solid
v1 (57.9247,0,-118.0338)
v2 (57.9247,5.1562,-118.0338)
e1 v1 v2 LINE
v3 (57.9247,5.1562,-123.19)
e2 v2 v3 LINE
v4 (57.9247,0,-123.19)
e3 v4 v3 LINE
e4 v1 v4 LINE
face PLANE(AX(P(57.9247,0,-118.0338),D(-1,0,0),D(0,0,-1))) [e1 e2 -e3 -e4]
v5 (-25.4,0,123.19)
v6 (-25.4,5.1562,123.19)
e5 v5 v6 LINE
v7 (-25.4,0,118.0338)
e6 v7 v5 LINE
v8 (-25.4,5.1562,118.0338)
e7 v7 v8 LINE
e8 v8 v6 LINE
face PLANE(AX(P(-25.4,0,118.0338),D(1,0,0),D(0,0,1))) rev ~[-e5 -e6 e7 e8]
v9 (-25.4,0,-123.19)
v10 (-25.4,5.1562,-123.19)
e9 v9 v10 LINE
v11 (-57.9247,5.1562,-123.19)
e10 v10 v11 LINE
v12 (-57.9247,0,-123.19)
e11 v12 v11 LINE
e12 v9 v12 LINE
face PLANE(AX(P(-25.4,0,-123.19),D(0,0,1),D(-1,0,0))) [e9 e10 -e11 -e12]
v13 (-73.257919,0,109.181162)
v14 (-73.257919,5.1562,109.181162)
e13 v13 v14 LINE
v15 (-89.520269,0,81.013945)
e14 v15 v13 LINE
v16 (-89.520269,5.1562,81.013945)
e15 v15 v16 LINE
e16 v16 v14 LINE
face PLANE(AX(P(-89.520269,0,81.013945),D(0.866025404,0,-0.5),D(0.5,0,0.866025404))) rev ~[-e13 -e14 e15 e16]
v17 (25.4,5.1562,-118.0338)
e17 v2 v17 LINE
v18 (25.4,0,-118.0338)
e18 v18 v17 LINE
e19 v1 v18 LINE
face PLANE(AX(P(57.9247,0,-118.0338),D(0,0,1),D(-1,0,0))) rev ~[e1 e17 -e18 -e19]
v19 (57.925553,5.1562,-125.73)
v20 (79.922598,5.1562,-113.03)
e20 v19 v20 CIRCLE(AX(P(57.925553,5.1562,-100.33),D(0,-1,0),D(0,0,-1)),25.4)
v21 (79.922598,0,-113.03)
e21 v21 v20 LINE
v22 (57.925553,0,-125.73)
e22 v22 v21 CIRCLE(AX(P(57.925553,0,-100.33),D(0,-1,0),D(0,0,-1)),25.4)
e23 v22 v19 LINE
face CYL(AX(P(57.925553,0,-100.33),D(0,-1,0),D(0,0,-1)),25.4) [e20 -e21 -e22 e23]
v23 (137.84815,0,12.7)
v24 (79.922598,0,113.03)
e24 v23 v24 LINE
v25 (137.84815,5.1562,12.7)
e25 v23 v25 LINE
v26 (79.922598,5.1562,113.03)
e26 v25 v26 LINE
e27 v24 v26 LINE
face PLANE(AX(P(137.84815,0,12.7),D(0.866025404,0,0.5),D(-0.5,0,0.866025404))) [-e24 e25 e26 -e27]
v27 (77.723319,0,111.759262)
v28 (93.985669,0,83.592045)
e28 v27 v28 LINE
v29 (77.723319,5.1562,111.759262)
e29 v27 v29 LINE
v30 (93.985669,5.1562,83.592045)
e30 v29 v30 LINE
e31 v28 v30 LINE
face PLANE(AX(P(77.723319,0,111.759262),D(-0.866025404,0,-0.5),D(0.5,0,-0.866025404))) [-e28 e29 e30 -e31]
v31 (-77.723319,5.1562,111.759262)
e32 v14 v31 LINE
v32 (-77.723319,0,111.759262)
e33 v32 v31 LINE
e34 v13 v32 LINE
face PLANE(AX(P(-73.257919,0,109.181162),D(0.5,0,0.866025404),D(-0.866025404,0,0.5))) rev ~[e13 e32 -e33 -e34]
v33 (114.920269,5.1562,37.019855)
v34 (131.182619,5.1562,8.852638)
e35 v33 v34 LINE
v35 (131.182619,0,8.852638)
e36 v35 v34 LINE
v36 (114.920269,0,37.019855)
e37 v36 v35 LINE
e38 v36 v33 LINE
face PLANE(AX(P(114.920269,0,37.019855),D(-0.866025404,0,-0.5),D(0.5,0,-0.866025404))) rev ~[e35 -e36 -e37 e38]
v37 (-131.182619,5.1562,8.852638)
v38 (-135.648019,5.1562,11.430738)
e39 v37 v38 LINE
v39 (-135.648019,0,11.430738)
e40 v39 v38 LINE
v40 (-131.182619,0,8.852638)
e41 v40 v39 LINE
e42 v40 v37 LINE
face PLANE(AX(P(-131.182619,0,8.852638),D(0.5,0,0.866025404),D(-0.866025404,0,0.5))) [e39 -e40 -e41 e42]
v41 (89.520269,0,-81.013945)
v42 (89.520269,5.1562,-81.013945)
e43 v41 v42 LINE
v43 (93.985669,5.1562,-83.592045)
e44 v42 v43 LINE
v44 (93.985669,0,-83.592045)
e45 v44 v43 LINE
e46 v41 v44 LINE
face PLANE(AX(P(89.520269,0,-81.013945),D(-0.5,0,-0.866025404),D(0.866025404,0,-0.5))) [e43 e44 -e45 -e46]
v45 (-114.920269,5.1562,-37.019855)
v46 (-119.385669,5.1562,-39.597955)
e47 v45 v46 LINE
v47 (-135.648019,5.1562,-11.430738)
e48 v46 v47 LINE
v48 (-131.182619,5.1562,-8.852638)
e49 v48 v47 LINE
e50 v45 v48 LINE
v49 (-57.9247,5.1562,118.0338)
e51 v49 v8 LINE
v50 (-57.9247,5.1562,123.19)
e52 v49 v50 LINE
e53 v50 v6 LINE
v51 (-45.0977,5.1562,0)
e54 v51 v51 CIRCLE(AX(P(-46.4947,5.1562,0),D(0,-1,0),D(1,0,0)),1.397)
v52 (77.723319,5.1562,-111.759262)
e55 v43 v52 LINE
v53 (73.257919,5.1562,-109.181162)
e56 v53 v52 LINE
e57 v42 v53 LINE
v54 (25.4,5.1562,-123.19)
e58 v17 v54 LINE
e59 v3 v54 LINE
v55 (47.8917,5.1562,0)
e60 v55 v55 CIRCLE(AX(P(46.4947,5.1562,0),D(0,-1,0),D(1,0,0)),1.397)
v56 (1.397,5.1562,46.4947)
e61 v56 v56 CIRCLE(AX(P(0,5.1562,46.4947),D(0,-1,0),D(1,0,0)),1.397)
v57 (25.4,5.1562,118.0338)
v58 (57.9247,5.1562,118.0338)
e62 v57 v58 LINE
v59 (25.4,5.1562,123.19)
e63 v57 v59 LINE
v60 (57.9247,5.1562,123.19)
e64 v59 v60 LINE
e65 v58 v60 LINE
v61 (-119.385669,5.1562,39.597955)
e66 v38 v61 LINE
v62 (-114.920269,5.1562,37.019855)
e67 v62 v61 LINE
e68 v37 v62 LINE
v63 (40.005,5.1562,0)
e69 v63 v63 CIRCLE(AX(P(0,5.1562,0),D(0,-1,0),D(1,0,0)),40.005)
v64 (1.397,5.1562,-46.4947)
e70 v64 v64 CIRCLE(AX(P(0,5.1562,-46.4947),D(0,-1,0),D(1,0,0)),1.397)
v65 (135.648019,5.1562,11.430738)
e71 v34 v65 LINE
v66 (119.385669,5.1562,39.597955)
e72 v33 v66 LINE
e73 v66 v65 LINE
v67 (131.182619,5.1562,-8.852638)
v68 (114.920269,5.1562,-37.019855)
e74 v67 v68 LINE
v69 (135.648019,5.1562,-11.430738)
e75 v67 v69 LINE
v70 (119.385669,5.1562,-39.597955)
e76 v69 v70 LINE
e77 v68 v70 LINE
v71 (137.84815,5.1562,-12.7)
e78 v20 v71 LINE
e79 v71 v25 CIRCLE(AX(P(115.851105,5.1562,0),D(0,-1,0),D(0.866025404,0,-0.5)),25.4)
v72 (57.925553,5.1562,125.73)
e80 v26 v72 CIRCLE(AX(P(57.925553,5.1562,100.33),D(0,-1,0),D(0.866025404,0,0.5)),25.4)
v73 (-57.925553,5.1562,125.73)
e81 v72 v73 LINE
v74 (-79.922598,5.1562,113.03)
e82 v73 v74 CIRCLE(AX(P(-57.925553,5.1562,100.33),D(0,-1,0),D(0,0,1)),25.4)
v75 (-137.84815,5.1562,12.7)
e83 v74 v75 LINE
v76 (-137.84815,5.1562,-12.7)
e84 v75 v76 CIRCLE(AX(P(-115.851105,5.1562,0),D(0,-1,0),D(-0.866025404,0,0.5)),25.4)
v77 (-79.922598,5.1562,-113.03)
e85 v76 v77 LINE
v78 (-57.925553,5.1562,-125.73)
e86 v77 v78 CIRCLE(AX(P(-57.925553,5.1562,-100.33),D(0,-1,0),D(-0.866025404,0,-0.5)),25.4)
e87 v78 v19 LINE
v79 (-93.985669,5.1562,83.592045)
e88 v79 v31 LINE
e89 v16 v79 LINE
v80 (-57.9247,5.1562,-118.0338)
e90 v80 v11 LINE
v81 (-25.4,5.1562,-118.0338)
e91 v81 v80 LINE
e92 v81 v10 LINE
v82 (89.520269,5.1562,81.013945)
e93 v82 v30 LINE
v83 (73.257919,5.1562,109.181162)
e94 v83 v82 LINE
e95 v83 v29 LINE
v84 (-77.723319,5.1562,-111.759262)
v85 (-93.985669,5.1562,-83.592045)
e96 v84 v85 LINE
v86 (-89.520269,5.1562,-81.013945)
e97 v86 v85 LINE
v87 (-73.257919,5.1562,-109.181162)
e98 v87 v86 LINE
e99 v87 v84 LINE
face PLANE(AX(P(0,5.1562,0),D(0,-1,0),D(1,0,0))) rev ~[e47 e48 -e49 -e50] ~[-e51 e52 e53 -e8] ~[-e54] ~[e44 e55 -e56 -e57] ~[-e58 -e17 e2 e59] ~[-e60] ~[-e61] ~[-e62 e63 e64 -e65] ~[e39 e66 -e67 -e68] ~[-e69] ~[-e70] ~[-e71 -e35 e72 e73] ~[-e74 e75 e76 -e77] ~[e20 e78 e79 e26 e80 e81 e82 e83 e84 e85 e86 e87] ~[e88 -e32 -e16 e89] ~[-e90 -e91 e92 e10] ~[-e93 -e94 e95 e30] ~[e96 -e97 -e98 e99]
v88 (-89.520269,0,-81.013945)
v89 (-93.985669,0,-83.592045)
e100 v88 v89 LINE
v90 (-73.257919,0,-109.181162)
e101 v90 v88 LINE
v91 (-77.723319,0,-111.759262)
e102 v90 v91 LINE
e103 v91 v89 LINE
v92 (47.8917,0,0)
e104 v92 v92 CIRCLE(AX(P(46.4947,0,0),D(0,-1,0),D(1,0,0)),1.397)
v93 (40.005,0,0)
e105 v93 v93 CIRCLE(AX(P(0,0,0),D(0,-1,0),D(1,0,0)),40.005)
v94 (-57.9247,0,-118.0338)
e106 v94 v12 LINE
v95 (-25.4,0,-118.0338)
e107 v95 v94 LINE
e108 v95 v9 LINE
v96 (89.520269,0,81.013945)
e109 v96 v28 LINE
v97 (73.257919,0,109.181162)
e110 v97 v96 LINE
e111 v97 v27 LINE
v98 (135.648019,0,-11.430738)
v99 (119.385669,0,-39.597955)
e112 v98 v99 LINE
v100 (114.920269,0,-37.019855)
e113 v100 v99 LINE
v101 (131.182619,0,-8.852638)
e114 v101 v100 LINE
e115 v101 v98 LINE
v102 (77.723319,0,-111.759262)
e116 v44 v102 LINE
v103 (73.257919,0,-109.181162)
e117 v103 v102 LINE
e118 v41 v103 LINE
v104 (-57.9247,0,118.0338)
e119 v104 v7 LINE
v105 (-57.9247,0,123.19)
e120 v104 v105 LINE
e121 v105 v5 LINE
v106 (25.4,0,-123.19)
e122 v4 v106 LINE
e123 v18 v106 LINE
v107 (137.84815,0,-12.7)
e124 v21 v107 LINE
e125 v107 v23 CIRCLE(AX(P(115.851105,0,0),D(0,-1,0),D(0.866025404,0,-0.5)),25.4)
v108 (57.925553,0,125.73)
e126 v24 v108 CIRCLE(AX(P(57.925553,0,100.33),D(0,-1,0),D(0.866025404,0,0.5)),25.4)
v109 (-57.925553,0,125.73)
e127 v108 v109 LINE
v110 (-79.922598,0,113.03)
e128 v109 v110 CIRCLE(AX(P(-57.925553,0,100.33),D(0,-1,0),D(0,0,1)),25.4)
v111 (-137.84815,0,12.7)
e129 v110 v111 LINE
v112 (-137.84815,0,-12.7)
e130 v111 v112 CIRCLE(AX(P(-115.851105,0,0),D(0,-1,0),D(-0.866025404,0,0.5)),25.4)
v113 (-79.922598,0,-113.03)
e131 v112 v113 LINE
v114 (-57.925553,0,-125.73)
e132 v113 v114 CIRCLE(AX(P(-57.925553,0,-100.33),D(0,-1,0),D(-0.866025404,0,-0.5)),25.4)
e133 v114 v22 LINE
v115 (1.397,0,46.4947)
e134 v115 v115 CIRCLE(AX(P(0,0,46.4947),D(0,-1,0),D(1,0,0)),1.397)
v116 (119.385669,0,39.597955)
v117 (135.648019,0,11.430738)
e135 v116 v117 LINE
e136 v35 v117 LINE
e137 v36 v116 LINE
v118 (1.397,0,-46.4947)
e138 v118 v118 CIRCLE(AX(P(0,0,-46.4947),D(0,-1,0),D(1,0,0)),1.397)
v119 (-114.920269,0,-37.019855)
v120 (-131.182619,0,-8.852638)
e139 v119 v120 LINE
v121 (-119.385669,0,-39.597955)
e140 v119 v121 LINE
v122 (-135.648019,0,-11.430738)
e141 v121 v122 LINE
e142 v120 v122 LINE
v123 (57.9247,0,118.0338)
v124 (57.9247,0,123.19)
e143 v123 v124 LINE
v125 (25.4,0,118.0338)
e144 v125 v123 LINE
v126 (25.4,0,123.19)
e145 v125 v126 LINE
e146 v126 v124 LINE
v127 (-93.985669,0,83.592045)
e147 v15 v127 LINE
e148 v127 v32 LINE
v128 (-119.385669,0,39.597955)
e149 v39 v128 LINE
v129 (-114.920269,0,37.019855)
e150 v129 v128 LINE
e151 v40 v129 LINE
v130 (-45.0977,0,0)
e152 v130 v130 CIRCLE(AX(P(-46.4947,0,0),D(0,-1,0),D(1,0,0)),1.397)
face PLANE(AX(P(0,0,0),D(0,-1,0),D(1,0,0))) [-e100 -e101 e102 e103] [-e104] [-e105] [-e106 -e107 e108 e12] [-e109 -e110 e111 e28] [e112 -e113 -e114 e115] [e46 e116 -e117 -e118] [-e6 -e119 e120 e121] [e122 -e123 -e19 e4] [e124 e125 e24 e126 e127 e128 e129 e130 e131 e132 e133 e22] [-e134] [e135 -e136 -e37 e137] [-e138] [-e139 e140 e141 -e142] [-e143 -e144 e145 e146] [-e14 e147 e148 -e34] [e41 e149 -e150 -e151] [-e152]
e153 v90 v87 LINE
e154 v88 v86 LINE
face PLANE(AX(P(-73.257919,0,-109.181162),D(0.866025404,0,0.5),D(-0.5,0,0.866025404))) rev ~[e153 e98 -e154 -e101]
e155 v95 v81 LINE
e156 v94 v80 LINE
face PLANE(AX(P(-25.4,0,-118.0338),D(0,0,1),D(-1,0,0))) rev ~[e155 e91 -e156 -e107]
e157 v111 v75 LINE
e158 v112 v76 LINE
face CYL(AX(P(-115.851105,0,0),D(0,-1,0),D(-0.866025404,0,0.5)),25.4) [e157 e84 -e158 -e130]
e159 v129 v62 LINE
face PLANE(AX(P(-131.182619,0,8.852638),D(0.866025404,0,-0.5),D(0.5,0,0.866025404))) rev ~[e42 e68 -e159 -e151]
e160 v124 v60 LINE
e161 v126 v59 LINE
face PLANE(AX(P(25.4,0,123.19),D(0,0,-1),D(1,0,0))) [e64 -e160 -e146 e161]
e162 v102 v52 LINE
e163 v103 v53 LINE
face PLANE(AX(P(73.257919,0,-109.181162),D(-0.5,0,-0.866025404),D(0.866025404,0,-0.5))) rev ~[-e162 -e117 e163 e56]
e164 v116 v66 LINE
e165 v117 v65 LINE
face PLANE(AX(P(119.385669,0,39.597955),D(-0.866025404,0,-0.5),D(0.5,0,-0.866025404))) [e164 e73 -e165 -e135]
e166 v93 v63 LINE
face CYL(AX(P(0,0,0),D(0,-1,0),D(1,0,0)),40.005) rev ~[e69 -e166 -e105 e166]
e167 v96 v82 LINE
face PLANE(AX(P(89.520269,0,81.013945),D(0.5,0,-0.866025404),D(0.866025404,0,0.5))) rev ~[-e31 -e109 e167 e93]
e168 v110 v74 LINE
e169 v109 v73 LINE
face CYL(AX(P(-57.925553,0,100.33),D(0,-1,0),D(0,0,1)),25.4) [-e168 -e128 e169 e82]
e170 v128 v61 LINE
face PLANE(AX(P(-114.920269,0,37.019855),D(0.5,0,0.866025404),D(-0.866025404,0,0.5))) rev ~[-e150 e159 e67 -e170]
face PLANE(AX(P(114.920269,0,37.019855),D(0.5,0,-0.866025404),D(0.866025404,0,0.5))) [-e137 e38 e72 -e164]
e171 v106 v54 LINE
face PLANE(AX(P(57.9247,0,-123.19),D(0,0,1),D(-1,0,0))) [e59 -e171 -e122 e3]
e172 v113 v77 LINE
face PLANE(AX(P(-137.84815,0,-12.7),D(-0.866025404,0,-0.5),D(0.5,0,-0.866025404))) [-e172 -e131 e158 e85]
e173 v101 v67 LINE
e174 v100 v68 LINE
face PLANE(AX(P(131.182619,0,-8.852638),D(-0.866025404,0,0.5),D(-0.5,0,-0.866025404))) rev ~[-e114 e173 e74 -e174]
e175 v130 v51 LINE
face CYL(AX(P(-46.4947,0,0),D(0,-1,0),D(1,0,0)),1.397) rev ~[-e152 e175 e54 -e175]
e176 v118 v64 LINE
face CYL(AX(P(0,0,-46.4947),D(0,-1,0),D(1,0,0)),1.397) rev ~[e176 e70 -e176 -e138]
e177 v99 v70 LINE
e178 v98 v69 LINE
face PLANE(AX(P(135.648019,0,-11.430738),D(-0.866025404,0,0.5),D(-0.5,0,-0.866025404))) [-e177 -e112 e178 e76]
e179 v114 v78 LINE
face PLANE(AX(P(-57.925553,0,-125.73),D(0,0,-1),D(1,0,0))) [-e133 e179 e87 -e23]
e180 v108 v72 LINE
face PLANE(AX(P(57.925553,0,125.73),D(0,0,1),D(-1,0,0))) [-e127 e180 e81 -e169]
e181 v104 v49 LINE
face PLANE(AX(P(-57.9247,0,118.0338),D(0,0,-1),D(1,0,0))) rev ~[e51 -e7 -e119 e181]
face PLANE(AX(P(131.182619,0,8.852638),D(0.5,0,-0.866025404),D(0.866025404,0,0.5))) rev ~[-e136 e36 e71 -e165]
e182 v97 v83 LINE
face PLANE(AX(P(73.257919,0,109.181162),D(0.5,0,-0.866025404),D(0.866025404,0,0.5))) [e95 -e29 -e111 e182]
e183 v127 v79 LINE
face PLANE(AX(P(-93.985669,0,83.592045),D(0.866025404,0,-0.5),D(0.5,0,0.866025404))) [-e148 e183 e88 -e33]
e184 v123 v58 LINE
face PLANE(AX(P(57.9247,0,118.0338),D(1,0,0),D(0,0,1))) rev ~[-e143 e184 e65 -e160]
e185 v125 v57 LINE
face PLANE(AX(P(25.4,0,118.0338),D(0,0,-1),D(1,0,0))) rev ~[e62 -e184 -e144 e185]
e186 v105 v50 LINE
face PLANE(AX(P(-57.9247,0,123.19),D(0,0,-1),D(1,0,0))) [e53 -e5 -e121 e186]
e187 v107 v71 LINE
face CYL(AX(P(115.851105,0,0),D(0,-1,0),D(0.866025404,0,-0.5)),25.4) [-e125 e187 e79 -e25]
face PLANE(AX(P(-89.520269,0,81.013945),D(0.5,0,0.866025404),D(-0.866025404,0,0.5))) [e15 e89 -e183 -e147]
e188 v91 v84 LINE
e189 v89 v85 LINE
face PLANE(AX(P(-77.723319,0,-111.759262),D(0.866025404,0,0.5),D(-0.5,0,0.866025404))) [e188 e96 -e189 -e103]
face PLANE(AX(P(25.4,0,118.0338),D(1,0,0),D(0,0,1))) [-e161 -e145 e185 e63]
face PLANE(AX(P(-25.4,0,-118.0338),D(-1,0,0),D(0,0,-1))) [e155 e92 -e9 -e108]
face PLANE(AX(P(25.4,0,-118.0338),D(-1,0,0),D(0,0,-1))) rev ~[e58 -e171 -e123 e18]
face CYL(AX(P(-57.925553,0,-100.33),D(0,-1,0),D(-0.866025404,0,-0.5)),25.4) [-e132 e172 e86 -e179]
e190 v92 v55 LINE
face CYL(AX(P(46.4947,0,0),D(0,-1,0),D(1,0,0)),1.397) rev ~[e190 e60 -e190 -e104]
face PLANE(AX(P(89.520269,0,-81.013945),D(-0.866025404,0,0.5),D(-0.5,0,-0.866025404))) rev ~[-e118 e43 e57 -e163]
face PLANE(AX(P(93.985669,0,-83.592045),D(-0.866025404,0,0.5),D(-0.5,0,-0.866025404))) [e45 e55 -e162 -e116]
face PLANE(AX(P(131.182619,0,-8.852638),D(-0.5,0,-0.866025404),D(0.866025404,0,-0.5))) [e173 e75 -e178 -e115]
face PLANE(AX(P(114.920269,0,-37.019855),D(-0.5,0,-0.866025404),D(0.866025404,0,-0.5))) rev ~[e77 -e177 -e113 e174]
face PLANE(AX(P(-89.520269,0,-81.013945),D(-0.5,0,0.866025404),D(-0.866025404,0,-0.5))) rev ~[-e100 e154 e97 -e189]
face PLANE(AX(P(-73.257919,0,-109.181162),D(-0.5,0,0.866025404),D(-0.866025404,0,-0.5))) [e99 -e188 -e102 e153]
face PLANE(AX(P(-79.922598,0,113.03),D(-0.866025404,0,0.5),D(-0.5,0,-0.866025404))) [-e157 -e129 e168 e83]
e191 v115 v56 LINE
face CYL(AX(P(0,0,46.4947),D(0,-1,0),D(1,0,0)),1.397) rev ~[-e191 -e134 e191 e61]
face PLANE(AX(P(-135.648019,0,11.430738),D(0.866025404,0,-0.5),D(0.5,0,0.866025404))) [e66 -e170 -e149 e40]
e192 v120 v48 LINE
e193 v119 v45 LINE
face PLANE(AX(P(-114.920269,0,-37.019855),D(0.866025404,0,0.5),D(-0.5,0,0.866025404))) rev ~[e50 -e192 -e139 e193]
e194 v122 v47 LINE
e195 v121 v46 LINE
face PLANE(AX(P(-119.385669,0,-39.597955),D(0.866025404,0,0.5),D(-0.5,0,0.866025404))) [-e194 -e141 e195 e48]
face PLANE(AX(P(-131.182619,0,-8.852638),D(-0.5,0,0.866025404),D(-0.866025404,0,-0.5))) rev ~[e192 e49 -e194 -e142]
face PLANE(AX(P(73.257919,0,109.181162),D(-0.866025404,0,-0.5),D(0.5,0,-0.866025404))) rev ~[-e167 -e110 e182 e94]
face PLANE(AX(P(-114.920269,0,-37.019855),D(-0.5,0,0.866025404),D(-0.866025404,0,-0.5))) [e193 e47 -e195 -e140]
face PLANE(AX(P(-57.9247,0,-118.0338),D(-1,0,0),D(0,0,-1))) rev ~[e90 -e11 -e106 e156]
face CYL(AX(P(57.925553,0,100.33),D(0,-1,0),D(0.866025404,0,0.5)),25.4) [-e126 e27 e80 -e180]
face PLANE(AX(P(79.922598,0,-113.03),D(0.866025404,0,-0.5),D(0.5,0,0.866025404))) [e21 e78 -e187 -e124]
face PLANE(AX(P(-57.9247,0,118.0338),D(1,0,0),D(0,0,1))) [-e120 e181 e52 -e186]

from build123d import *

# Parameters (mm, degrees)
F1_DEPTH        = 5.1562
F2_R            = 40.005
F2_R_2          = 1.397
F3_DEPTH        = 5.1572
F4_W            = 32.5247
F4_H            = 5.1562
F5_DEPTH        = 5.1572
F5_COPIES_COUNT = 6


# Not quite as in the source:
# - a pattern or mirror of a feature is missing from the dataset's text; its kind, count and spacing are read off the source's solid


with BuildPart() as f1:
    # F0 (on Front) → F1 (new body)
    with BuildSketch(Plane.XZ):
        with BuildLine():
            Line((137.8481502717, 12.7), (79.9225977639, 113.03))
            ThreePointArc((79.9225977639, 113.03), (70.6255525078, 122.3270452561), (57.9255525078, 125.73))
            Line((57.9255525078, 125.73), (-57.9255525078, 125.73))
            ThreePointArc((-57.9255525078, 125.73), (-70.6255525078, 122.3270452561), (-79.9225977639, 113.03))
            Line((-79.9225977639, 113.03), (-137.8481502717, 12.7))
            ThreePointArc((-137.8481502717, 12.7), (-141.2511050156, 0), (-137.8481502717, -12.7))
            Line((-137.8481502717, -12.7), (-79.9225977639, -113.03))
            ThreePointArc((-79.9225977639, -113.03), (-70.6255525078, -122.3270452561), (-57.9255525078, -125.73))
            Line((-57.9255525078, -125.73), (57.9255525078, -125.73))
            ThreePointArc((57.9255525078, -125.73), (70.6255525078, -122.3270452561), (79.9225977639, -113.03))
            Line((79.9225977639, -113.03), (137.8481502717, -12.7))
            ThreePointArc((137.8481502717, -12.7), (141.2511050156, 0), (137.8481502717, 12.7))
        make_face()
    extrude(amount=-F1_DEPTH)

    # F2 (on face) → F3 (cut, through all)
    with BuildSketch(Plane.XZ):
        Circle(F2_R)
        with Locations((0, 46.4947)):
            Circle(F2_R_2)
        with Locations((-46.4947, 0)):
            Circle(F2_R_2)
        with Locations((0, -46.4947)):
            Circle(F2_R_2)
        with Locations((46.4947, 0)):
            Circle(F2_R_2)
    extrude(amount=-F3_DEPTH, mode=Mode.SUBTRACT)

    # F4 (on face) → F5 (cut, through all)
    with BuildSketch(Plane.XZ):
        with Locations((-41.66235, 120.6119)):
            Rectangle(F4_W, F4_H)
        with Locations((41.66235, 120.6119)):
            Rectangle(F4_W, F4_H)
    f5 = extrude(amount=-F5_DEPTH, mode=Mode.SUBTRACT)

    # F5_copies: F5 ×6 about axis
    f5_copies_axis = Axis((0, 0, 0), (0, 1, 0))
    for i in range(1, F5_COPIES_COUNT):
        add(f5.rotate(f5_copies_axis, i * 360 / F5_COPIES_COUNT), mode=Mode.SUBTRACT)


solid = f1.part
